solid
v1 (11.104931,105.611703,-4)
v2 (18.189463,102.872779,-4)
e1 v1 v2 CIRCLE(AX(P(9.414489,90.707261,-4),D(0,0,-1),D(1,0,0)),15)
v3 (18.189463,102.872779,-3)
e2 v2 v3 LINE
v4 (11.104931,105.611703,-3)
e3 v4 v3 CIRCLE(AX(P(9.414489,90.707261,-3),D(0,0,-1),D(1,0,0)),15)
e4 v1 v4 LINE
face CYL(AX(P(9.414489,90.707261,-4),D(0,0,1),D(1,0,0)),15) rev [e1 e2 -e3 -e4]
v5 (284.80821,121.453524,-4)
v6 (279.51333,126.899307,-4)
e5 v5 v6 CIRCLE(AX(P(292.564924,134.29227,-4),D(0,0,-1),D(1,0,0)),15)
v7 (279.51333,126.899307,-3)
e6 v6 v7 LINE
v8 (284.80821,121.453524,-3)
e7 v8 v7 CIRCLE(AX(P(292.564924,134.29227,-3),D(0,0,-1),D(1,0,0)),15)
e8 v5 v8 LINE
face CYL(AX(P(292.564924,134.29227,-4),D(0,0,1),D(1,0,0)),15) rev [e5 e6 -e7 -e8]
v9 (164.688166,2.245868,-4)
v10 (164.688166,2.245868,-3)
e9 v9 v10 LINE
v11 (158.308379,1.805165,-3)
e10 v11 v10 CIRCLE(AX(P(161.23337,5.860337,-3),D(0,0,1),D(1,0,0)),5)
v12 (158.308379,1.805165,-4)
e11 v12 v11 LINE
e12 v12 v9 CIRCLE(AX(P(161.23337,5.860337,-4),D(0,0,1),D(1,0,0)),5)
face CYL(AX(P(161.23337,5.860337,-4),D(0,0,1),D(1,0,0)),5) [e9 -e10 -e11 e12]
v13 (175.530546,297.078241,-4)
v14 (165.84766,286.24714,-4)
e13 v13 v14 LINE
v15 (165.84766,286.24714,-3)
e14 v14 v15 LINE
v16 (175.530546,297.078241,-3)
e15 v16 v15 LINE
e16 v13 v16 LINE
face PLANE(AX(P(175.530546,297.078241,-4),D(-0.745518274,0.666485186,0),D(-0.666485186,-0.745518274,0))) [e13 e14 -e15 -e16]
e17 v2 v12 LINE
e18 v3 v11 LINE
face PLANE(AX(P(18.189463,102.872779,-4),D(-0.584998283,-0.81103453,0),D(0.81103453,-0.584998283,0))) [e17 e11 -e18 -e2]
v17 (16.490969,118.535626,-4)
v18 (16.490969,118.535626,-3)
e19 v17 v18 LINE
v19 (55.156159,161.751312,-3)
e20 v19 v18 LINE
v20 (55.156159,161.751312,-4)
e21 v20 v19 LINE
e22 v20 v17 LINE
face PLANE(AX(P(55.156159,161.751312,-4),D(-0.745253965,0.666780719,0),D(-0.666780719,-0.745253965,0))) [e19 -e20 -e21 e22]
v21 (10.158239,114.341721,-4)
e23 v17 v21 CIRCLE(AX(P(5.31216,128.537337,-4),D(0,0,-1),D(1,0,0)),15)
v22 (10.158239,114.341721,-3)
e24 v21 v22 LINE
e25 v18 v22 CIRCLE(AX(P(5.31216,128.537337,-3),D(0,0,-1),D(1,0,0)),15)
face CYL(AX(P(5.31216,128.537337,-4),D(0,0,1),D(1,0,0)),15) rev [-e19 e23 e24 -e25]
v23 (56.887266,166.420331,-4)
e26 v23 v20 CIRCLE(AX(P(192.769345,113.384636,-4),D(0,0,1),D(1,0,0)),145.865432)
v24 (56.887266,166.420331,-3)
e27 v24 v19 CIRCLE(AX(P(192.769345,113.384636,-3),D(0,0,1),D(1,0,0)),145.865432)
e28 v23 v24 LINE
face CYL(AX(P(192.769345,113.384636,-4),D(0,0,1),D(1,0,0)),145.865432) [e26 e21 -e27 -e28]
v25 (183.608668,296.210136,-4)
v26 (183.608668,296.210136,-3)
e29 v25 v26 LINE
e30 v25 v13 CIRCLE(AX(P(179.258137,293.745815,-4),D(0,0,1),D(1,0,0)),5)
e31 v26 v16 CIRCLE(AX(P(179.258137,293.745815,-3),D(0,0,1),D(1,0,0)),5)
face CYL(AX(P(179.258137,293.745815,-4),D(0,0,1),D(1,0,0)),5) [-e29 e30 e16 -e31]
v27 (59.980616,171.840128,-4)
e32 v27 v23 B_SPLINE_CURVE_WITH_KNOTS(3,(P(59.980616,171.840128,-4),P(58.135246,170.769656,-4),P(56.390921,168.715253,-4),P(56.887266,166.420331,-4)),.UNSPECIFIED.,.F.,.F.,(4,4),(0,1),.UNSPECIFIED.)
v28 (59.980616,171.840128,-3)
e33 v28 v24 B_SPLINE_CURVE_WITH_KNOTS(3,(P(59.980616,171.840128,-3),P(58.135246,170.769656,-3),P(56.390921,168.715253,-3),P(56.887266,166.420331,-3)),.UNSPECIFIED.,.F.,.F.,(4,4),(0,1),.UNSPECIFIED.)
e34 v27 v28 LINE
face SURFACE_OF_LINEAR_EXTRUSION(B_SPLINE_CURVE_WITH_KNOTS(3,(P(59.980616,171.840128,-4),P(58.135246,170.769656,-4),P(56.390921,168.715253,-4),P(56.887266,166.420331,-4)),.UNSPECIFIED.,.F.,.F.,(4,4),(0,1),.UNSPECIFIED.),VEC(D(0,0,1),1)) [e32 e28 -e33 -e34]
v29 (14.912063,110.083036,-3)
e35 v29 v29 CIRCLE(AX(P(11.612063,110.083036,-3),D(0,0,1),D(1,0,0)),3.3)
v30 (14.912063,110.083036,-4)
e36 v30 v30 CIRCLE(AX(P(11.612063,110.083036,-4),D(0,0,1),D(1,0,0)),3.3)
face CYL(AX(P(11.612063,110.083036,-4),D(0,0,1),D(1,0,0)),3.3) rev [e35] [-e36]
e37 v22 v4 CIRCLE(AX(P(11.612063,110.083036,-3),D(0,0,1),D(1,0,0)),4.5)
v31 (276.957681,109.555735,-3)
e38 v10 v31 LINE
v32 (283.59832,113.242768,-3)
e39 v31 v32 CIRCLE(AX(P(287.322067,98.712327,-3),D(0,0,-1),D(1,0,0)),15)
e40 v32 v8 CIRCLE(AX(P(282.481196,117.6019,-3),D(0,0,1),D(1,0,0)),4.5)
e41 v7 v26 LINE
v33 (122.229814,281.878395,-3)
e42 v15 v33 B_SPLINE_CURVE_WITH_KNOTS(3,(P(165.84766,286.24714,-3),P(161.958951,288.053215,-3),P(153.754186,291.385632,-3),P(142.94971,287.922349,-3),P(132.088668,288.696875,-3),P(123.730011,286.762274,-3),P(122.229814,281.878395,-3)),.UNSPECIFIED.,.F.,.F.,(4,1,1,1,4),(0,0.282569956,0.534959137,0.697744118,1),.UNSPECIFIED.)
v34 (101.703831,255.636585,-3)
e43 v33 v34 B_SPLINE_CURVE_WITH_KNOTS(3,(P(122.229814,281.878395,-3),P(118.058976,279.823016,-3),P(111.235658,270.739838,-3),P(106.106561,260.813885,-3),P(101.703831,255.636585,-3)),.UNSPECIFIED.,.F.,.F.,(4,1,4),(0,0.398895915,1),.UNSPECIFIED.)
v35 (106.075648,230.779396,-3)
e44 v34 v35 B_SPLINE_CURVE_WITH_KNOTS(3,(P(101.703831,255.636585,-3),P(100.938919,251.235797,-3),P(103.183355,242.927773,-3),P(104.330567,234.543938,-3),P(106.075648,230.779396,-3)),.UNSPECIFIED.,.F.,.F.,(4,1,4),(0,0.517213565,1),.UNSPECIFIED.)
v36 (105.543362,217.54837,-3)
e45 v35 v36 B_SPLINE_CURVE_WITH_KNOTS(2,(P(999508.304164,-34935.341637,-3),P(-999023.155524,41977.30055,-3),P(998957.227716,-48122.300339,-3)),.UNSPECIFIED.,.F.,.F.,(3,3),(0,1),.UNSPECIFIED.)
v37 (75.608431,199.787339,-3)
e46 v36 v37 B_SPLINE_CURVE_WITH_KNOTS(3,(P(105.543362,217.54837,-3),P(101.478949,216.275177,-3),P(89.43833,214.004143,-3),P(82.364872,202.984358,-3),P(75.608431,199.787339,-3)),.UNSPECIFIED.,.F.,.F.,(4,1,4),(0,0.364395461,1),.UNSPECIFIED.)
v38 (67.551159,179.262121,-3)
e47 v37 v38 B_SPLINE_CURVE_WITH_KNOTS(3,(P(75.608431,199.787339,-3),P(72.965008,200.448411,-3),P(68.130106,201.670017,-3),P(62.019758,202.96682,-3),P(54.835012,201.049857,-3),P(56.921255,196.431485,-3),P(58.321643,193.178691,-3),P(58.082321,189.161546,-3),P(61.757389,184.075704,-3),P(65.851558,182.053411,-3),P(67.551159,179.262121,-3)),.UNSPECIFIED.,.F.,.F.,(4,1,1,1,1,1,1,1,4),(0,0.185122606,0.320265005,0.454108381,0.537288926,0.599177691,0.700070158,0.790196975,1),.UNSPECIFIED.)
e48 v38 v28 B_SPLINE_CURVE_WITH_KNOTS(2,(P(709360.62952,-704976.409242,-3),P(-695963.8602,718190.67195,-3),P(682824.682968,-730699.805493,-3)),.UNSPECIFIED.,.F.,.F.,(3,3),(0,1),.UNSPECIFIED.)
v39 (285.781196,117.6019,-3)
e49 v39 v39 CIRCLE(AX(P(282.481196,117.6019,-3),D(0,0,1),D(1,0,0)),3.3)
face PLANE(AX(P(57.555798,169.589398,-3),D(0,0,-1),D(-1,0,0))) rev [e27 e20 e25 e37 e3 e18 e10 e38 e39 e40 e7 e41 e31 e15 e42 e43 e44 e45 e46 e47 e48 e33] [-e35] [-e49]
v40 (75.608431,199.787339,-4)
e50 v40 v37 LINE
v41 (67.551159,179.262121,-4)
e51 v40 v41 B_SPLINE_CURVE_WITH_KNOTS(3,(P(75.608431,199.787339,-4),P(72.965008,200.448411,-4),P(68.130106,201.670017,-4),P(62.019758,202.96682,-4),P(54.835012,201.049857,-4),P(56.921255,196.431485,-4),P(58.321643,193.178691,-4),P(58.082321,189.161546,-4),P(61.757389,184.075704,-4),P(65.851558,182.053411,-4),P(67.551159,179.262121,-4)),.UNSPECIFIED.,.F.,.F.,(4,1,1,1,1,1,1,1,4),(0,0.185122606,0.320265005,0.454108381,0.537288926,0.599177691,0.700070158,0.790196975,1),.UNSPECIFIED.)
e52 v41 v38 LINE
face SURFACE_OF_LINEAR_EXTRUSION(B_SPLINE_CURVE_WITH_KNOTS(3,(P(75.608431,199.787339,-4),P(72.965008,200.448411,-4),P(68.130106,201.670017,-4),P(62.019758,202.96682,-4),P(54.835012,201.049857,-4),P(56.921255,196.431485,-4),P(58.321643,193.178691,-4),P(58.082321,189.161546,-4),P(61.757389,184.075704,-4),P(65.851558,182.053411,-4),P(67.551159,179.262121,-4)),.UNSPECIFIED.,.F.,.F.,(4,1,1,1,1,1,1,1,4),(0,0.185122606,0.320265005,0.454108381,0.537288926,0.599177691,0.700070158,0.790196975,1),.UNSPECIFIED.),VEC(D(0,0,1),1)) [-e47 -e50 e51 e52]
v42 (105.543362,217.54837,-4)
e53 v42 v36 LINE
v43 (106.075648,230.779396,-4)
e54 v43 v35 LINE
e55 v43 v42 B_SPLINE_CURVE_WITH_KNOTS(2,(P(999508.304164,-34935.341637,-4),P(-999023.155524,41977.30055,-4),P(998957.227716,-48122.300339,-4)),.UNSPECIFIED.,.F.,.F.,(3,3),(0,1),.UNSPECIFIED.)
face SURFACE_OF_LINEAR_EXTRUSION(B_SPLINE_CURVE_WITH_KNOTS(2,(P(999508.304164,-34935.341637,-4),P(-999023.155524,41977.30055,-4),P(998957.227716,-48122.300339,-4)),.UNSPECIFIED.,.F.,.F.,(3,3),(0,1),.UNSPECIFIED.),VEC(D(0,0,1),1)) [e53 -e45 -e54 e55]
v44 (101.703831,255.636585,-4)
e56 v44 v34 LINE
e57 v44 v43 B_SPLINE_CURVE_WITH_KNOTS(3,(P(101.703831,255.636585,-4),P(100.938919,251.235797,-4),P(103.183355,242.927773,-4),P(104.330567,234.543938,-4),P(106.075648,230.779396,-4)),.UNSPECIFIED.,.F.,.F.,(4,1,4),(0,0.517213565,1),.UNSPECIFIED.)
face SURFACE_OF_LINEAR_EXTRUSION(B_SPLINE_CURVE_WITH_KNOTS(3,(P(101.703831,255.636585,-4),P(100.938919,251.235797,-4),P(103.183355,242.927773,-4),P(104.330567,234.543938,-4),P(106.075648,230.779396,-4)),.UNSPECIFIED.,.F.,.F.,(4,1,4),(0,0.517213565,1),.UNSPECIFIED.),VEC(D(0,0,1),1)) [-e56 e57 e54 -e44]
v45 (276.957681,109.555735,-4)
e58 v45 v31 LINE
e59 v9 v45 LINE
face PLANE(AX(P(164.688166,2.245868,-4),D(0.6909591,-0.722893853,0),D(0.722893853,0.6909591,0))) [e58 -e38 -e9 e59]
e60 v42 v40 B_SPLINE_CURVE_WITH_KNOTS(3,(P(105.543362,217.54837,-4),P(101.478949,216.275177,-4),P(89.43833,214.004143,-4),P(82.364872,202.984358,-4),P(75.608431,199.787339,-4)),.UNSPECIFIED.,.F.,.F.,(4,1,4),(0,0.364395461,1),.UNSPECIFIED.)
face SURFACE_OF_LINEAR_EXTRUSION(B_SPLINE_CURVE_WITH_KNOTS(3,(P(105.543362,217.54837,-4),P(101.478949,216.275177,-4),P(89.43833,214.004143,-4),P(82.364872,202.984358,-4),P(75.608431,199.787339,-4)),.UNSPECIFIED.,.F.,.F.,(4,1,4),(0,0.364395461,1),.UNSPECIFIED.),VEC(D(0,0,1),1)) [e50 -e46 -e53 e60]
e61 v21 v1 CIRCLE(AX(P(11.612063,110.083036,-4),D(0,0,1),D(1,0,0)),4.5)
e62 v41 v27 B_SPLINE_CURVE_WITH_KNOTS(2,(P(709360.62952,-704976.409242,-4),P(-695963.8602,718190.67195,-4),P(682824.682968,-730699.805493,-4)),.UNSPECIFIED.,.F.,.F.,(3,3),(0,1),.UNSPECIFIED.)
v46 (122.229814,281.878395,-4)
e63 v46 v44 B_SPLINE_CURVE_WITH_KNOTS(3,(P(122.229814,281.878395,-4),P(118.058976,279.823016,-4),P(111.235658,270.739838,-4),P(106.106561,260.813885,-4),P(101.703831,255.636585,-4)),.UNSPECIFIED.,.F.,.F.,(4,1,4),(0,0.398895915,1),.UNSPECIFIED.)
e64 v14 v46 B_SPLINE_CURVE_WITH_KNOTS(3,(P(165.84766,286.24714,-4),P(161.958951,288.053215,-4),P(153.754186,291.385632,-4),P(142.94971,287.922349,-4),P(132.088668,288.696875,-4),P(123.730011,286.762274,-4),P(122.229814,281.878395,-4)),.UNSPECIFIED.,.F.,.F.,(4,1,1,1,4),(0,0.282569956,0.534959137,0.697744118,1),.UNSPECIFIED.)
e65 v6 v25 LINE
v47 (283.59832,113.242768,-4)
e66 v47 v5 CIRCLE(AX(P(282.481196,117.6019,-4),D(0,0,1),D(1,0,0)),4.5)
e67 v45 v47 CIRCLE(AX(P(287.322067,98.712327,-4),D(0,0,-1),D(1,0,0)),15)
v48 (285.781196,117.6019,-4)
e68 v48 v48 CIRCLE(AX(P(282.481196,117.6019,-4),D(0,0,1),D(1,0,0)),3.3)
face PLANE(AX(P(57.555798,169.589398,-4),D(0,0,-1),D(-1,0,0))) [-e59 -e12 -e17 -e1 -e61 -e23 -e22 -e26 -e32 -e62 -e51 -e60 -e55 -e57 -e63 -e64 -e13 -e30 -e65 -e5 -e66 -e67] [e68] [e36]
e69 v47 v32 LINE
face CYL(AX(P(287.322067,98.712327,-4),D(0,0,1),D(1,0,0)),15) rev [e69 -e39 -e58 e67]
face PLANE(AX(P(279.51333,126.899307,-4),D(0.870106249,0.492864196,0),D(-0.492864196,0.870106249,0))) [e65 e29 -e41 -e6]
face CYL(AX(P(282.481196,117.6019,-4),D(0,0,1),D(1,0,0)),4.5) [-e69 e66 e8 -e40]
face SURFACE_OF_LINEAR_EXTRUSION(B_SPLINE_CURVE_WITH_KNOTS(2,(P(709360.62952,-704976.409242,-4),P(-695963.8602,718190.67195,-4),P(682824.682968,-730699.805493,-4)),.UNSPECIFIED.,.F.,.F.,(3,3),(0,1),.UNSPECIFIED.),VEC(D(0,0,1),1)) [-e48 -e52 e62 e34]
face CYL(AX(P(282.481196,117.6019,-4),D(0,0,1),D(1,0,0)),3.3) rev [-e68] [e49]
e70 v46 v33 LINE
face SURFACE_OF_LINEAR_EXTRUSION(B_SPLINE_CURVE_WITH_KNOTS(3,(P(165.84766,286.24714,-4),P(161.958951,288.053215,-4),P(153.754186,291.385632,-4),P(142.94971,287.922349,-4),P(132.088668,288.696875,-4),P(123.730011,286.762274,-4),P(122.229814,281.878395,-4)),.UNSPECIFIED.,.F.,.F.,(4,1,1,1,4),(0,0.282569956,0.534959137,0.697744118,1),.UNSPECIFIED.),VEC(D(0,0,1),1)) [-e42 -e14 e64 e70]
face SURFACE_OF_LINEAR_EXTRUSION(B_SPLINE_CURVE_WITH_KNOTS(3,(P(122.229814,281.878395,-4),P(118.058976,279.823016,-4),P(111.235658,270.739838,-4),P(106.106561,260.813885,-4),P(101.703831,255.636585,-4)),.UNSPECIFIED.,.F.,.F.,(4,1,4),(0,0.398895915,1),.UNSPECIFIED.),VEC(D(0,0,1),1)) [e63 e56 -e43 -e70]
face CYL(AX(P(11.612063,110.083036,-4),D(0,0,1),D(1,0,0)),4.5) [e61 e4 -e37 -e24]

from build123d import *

# Parameters (mm, degrees)
BOSS_EXTRUDE1_START = -3
SKETCH1_R           = 3.3
BOSS_EXTRUDE1_DEPTH = 1


with BuildPart() as part:
    # Sketch1 → Boss-Extrude1 (new body)
    with BuildSketch(Plane.XY.offset(BOSS_EXTRUDE1_START)):
        with BuildLine():
            Line((175.530545653, 297.078241002), (165.847660098, 286.247140349))
            add(Edge.make_bspline(
                [(165.847660098, 286.247140349), (161.958951275, 288.053215105), (153.7541863, 291.385632032), (142.949710049, 287.922349017), (132.08866755, 288.696875058), (123.730011038, 286.762274271), (122.229813512, 281.878394702)],
                knots=[0, 0, 0, 0, 0.282569956, 0.534959137, 0.697744118, 1, 1, 1, 1], degree=3))
            add(Edge.make_bspline(
                [(122.229813512, 281.878394702), (118.058976155, 279.823016138), (111.235657544, 270.739838071), (106.106560937, 260.813884877), (101.703831056, 255.636584821)],
                knots=[0, 0, 0, 0, 0.398895915, 1, 1, 1, 1], degree=3))
            add(Edge.make_bspline(
                [(101.703831056, 255.636584821), (100.938919323, 251.235797266), (103.183355148, 242.927772517), (104.33056652, 234.543938083), (106.075647572, 230.779395719)],
                knots=[0, 0, 0, 0, 0.517213565, 1, 1, 1, 1], degree=3))
            add(Edge.make_bspline(
                [(106.075647572, 230.779395719), (103.798133299, 224.247937083), (105.543362439, 217.548369999)],
                knots=[0, 0, 0, 1, 1, 1], degree=2))
            add(Edge.make_bspline(
                [(105.543362439, 217.548369999), (101.478949421, 216.275176704), (89.438329667, 214.004143017), (82.364872068, 202.984357934), (75.608431069, 199.787338704)],
                knots=[0, 0, 0, 0, 0.364395461, 1, 1, 1, 1], degree=3))
            add(Edge.make_bspline(
                [(75.608431069, 199.787338704), (72.965008377, 200.448410696), (68.130105896, 201.670017191), (62.019757504, 202.966820343), (54.835011624, 201.049857451), (56.921255323, 196.431484587), (58.321643082, 193.17869111), (58.082321369, 189.161546227), (61.757389476, 184.075704484), (65.851558074, 182.053410846), (67.551159033, 179.262120633)],
                knots=[0, 0, 0, 0, 0.185122606, 0.320265005, 0.454108381, 0.537288926, 0.599177691, 0.700070158, 0.790196975, 1, 1, 1, 1], degree=3))
            add(Edge.make_bspline(
                [(67.551159033, 179.262120633), (63.651335521, 175.669295098), (59.980616164, 171.840128471)],
                knots=[0, 0, 0, 1, 1, 1], degree=2))
            add(Edge.make_bspline(
                [(59.980616164, 171.840128471), (58.13524604, 170.76965569), (56.3909212, 168.715252622), (56.887266336, 166.42033094)],
                knots=[0, 0, 0, 0, 1, 1, 1, 1], degree=3))
            ThreePointArc((56.887266336, 166.42033094), (56.001787201, 164.093208994), (55.156159125, 161.751311683))
            Line((55.156159125, 161.751311683), (16.490969335, 118.53562592))
            ThreePointArc((16.490969335, 118.53562592), (13.594458931, 116.03119733), (10.158239499, 114.341720756))
            ThreePointArc((10.158239499, 114.341720756), (7.138291038, 109.59789587), (11.104930852, 105.61170322))
            ThreePointArc((11.104930852, 105.61170322), (14.823431664, 104.698091272), (18.189463296, 102.87277866))
            Line((18.189463296, 102.87277866), (158.308378587, 1.805164583))
            ThreePointArc((158.308378587, 1.805164583), (161.577939242, 0.872224158), (164.688165503, 2.245867969))
            Line((164.688165503, 2.245867969), (276.957680669, 109.555734945))
            ThreePointArc((276.957680669, 109.555734945), (280.040760403, 111.826539744), (283.598320347, 113.242767948))
            ThreePointArc((283.598320347, 113.242767948), (286.933122885, 116.94588976), (284.808210365, 121.45352394))
            ThreePointArc((284.808210365, 121.45352394), (281.810364375, 123.835719251), (279.51333018, 126.899306851))
            Line((279.51333018, 126.899306851), (183.60866827, 296.210136052))
            ThreePointArc((183.60866827, 296.210136052), (179.792379546, 298.717191637), (175.530545653, 297.078241002))
        make_face()
        with Locations((11.612063393, 110.083035973)):
            Circle(SKETCH1_R, mode=Mode.SUBTRACT)
        with Locations((282.4811963, 117.601900186)):
            Circle(SKETCH1_R, mode=Mode.SUBTRACT)
    extrude(amount=-BOSS_EXTRUDE1_DEPTH)


solid = part.part
